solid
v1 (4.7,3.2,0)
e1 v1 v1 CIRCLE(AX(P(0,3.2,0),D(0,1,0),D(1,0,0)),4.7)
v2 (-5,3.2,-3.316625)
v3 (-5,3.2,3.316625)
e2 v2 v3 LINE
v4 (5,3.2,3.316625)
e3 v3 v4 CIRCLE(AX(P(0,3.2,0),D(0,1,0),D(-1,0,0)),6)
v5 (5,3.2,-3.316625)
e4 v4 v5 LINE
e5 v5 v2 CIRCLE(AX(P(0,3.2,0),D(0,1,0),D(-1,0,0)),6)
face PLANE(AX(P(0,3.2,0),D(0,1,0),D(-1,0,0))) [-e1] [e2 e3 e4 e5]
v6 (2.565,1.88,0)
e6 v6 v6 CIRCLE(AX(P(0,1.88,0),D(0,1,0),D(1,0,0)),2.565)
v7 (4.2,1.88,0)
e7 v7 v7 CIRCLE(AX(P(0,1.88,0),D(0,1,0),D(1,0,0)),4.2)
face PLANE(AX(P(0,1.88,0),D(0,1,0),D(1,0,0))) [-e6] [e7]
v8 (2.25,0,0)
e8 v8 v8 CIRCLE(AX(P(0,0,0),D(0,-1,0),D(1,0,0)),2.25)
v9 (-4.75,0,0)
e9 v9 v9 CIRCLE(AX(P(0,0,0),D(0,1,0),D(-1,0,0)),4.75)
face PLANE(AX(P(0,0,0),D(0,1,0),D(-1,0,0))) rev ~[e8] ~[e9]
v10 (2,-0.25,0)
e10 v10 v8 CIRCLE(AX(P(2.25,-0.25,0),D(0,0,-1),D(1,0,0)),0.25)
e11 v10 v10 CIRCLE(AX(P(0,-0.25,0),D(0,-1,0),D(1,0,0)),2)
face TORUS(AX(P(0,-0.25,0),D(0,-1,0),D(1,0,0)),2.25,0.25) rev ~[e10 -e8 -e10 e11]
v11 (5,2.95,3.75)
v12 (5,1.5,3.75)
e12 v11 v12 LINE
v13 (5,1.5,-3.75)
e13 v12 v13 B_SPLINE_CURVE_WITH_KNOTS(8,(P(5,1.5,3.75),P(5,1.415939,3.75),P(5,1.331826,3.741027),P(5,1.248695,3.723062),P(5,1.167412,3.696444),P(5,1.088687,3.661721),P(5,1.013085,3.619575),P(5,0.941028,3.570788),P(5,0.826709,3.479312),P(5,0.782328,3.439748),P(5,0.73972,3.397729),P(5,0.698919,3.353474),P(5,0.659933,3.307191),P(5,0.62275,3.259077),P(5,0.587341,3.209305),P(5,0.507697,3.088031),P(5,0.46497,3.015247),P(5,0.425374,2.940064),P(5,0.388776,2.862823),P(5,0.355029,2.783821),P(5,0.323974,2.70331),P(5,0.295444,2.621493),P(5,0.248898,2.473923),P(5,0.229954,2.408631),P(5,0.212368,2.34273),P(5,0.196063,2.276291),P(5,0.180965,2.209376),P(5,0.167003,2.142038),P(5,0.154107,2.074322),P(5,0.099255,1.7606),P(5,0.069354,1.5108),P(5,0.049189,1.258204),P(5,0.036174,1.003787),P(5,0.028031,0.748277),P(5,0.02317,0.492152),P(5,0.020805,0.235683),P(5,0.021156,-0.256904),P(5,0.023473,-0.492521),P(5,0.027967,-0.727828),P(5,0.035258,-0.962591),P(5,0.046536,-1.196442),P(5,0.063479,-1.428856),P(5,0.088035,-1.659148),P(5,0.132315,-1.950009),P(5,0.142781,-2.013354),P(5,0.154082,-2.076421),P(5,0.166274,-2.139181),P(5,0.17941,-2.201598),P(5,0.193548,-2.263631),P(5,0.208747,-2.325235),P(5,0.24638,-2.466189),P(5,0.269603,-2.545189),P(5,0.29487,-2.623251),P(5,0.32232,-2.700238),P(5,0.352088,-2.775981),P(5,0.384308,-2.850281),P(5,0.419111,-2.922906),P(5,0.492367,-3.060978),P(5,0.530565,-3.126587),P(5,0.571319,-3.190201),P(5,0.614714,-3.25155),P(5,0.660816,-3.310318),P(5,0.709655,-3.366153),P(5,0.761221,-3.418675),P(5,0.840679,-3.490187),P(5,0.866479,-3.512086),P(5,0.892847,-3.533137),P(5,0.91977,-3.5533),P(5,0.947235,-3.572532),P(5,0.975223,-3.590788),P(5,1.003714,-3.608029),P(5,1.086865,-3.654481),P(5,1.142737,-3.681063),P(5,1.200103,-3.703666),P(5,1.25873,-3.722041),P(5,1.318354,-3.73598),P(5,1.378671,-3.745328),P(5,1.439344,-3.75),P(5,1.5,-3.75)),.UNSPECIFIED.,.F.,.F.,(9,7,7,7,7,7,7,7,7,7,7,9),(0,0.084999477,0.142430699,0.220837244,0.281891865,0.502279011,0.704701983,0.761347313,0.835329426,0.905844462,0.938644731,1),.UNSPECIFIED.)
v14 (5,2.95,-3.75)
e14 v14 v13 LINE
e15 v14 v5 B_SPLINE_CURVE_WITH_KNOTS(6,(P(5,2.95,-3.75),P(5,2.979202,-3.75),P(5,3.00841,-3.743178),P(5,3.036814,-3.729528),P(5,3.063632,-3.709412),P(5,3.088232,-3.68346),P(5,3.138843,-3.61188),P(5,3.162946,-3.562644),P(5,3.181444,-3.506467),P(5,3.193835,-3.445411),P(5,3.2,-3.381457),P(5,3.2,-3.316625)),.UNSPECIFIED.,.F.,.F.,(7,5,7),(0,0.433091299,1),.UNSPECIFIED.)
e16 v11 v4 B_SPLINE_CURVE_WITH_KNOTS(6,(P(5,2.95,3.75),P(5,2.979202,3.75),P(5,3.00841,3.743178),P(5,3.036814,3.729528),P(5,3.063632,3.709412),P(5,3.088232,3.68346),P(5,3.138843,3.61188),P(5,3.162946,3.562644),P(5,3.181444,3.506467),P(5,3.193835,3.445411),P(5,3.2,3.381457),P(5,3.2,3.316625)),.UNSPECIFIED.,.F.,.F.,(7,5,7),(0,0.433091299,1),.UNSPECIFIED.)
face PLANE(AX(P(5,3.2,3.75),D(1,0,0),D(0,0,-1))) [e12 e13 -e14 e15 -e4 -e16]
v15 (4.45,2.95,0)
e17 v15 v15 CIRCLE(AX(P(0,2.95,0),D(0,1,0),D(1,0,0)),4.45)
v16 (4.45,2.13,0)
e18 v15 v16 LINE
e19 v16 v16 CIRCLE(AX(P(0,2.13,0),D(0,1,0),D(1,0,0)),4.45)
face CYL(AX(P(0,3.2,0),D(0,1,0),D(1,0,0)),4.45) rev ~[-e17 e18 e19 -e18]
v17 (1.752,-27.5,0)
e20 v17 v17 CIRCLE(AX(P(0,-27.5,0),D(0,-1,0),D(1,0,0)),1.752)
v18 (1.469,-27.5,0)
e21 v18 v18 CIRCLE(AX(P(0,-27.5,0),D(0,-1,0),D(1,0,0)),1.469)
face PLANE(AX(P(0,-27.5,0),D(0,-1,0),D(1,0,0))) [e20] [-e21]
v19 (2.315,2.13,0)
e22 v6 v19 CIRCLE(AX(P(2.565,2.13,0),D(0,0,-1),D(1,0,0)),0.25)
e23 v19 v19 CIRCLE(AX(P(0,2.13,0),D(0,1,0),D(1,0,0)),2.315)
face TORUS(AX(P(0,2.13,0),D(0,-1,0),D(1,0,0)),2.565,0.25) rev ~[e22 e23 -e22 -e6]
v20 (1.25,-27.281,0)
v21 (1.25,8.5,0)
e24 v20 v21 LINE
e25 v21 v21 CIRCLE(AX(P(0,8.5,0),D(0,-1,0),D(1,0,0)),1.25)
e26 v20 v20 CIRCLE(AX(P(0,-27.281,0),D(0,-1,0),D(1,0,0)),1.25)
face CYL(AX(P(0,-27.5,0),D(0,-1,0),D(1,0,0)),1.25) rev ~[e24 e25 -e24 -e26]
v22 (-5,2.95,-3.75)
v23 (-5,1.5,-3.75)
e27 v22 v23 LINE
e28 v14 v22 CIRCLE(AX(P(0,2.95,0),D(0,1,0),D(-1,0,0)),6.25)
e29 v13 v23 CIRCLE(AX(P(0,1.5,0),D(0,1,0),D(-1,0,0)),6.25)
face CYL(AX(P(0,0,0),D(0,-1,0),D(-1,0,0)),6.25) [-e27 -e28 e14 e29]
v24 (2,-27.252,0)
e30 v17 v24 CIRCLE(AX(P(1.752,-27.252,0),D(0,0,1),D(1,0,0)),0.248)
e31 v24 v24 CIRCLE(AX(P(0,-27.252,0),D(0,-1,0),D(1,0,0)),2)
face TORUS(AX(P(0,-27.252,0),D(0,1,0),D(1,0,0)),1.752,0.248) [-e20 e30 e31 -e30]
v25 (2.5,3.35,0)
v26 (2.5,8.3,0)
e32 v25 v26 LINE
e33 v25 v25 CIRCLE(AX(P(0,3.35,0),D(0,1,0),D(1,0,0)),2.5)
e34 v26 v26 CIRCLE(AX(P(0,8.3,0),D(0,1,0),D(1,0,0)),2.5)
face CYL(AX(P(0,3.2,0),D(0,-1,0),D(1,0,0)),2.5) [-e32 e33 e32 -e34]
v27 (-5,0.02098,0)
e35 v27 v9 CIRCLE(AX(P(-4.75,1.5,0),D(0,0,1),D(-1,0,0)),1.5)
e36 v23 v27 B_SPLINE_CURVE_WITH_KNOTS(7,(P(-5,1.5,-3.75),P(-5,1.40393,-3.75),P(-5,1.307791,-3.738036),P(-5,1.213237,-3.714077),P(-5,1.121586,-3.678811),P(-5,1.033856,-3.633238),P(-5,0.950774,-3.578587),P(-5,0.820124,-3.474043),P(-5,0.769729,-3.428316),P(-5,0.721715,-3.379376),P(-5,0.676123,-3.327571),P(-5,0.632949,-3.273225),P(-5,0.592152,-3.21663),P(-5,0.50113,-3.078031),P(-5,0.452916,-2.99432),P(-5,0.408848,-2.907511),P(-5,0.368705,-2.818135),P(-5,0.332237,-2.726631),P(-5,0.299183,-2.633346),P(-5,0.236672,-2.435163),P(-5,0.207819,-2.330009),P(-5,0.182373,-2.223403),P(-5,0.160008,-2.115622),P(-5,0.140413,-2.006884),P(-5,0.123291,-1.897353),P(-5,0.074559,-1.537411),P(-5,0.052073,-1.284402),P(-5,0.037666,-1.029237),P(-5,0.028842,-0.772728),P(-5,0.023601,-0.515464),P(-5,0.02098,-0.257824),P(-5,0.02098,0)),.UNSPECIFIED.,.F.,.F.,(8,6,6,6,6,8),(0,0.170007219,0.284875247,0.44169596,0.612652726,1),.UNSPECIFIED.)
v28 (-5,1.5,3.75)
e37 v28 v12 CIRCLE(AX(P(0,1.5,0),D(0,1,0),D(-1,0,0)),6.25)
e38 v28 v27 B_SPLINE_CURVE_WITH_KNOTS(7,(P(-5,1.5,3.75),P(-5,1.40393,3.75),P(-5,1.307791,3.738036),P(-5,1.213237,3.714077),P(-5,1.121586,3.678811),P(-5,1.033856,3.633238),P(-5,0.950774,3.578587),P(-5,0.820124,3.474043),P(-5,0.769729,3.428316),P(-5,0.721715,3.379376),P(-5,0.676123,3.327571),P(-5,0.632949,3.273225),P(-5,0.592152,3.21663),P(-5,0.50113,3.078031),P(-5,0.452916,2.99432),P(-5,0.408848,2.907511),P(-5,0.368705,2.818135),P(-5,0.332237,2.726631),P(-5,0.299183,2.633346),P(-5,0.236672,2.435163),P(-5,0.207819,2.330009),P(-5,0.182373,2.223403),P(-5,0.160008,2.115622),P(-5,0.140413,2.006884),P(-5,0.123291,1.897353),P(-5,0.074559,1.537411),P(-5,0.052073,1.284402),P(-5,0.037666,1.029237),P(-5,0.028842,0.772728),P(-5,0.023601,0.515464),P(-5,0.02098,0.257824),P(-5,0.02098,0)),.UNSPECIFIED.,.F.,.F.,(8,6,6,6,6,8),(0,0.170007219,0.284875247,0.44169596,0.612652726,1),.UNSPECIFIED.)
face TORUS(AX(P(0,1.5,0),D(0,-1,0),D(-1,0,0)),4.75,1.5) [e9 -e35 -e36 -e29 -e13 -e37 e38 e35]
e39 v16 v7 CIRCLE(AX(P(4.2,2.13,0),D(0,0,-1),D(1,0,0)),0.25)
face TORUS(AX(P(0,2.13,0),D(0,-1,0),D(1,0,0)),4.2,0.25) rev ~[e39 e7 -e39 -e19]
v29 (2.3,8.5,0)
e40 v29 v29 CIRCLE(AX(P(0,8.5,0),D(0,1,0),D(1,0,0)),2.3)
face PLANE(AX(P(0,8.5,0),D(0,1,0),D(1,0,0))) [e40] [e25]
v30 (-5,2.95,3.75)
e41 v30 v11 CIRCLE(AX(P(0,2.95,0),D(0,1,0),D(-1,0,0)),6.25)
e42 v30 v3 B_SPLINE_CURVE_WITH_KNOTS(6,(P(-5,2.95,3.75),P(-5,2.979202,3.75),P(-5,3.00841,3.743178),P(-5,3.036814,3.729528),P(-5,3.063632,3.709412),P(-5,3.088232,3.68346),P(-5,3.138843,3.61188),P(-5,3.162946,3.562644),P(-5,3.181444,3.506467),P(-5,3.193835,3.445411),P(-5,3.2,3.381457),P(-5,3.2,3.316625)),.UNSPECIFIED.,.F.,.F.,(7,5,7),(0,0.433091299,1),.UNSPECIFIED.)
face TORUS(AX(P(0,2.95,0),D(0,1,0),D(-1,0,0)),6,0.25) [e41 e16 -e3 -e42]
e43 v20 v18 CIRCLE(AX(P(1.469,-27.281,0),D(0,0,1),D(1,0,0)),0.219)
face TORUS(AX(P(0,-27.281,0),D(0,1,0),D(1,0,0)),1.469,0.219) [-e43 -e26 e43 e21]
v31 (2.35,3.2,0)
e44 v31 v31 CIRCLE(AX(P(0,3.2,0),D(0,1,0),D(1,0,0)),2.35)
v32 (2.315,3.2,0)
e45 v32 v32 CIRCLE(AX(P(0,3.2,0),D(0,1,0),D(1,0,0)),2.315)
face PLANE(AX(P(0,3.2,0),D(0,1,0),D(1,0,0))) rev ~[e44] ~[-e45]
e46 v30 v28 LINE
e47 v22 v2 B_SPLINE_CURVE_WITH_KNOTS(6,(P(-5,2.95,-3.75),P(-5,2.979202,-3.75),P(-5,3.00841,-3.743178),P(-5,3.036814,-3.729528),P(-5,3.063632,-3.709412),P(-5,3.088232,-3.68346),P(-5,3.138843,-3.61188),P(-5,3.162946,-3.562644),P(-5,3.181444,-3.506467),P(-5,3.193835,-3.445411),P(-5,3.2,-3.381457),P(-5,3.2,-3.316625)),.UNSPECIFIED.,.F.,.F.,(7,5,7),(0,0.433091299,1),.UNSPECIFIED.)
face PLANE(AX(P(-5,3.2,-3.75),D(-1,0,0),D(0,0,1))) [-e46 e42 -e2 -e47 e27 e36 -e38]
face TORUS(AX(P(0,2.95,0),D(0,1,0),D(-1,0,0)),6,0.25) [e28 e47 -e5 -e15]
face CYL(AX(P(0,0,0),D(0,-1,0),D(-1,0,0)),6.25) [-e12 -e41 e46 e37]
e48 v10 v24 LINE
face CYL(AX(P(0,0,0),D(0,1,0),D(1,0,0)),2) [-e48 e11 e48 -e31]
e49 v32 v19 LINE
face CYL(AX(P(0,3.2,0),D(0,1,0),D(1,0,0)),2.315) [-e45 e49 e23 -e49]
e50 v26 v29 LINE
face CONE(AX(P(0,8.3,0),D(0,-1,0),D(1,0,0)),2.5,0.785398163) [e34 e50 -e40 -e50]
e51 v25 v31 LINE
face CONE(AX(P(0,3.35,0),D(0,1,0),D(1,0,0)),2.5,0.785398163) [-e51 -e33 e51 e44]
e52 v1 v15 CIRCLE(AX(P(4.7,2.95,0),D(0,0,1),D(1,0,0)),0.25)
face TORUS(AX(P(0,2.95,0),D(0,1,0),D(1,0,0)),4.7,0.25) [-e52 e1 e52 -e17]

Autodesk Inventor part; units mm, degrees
ref_plane "YZ Plane" through (0, 0, 0) normal (1, 0, 0) x (0, 1, 0)
ref_plane "XZ Plane" through (0, 0, 0) normal (0, 1, 0) x (-1, 0, 0)
ref_plane "XY Plane" through (0, 0, 0) normal (0, 0, 1) x (1, 0, 0)
sketch "Sketch1" plane through (0, 0, 0) normal (0, 1, 0) x (-1, 0, 0)
  circle A0 centre (0, 0) radius 6.25
  dimension "d0" = 12.5
extrude "Extrusion1" add sketch "Sketch1" along normal blind 3.2
sketch "Sketch2" plane through (0, 3.2, 0) normal (0, 1, 0) x (1, 0, 0)
  circle A0 centre (0, 0) radius 2.315
  circle A1 centre (0, 0) radius 4.45
  dimension "d3" = 4.63
  dimension "d4" = 8.9
extrude "Extrusion2" cut sketch "Sketch2" against normal blind 1.32
fillet "Fillet1" radius 0.25 4 edges at (-4.45, 1.88, 0) (-2.315, 1.88, 0) (-4.45, 3.2, 0) (6.25, 3.2, 0)
fillet "Fillet6" radius 1.5 1 edges at (6.25, 0, 0)
sketch "Sketch3" plane through (0, 3.2, 0) normal (0, 1, 0) x (1, 0, 0)
  circle A0 centre (0, 0) radius 2.5
  dimension "d8" = 5
extrude "Extrusion3" add sketch "Sketch3" along normal blind 5.3
chamfer "Chamfer2" distance 0.2 angle 45 1 edges at (-2.5, 8.5, 0)
chamfer "Chamfer3" distance 0.15 angle 45 1 edges at (-2.5, 3.2, 0)
sketch "Sketch4" plane through (0, 0, 0) normal (0, -1, 0) x (1, 0, 0)
  circle A0 centre (0, 0) radius 6 projected
  circle A1 centre (0, 0) radius 2
  dimension "d20" = 4
extrude "Extrusion4" add sketch "Sketch4" along normal blind 27.5 contours A1
sketch "Sketch5" plane through (0, -27.5, 0) normal (0, -1, 0) x (1, 0, 0)
  circle A0 centre (0, 0) radius 2 projected
  circle A1 centre (0, 0) radius 1.25
  dimension "d23" = 2.5
extrude "Extrusion5" cut sketch "Sketch5" against normal through all contours A1
thread "Thread1" size "M5x0.8" class "6g" standard "ANSI Metric M Profile" full length
fillet "Fillet2" radius 0.219 1 edges at (-1.25, -27.5, 0)
fillet "Fillet3" radius 0.248 1 edges at (-2, -27.5, 0)
sketch "Sketch6" plane through (0, 3.2, 0) normal (0, 1, 0) x (1, 0, 0)
  circle A0 centre (0, 0) radius 6.25 projected
  circle A1 centre (0, 0) radius 6.25
  line L0 (5, 6.4624) -> (-5, 6.4624)
  line L1 (-5, 6.4624) -> (-5, -6.4624)
  line L2 (-5, -6.4624) -> (5, -6.4624)
  line L3 (5, -6.4624) -> (5, 6.4624)
  line L4 (5, 6.4624) -> (-5, -6.4624) construction
  line L5 (-5, 6.4624) -> (5, -6.4624) construction
  point P0 (5, 3.75)
  point P1 (5, -3.75)
  point P2 (-5, -3.75)
  point P3 (-5, 3.75)
  dimension "d30" = 10
extrude "Extrusion6" cut sketch "Sketch6" against normal blind 10 contours A0 L3 | L1 A0
fillet "Fillet5" radius 0.25 1 edges at (-2, 0, 0)
properties part number "Cartridge Interface Tube"
